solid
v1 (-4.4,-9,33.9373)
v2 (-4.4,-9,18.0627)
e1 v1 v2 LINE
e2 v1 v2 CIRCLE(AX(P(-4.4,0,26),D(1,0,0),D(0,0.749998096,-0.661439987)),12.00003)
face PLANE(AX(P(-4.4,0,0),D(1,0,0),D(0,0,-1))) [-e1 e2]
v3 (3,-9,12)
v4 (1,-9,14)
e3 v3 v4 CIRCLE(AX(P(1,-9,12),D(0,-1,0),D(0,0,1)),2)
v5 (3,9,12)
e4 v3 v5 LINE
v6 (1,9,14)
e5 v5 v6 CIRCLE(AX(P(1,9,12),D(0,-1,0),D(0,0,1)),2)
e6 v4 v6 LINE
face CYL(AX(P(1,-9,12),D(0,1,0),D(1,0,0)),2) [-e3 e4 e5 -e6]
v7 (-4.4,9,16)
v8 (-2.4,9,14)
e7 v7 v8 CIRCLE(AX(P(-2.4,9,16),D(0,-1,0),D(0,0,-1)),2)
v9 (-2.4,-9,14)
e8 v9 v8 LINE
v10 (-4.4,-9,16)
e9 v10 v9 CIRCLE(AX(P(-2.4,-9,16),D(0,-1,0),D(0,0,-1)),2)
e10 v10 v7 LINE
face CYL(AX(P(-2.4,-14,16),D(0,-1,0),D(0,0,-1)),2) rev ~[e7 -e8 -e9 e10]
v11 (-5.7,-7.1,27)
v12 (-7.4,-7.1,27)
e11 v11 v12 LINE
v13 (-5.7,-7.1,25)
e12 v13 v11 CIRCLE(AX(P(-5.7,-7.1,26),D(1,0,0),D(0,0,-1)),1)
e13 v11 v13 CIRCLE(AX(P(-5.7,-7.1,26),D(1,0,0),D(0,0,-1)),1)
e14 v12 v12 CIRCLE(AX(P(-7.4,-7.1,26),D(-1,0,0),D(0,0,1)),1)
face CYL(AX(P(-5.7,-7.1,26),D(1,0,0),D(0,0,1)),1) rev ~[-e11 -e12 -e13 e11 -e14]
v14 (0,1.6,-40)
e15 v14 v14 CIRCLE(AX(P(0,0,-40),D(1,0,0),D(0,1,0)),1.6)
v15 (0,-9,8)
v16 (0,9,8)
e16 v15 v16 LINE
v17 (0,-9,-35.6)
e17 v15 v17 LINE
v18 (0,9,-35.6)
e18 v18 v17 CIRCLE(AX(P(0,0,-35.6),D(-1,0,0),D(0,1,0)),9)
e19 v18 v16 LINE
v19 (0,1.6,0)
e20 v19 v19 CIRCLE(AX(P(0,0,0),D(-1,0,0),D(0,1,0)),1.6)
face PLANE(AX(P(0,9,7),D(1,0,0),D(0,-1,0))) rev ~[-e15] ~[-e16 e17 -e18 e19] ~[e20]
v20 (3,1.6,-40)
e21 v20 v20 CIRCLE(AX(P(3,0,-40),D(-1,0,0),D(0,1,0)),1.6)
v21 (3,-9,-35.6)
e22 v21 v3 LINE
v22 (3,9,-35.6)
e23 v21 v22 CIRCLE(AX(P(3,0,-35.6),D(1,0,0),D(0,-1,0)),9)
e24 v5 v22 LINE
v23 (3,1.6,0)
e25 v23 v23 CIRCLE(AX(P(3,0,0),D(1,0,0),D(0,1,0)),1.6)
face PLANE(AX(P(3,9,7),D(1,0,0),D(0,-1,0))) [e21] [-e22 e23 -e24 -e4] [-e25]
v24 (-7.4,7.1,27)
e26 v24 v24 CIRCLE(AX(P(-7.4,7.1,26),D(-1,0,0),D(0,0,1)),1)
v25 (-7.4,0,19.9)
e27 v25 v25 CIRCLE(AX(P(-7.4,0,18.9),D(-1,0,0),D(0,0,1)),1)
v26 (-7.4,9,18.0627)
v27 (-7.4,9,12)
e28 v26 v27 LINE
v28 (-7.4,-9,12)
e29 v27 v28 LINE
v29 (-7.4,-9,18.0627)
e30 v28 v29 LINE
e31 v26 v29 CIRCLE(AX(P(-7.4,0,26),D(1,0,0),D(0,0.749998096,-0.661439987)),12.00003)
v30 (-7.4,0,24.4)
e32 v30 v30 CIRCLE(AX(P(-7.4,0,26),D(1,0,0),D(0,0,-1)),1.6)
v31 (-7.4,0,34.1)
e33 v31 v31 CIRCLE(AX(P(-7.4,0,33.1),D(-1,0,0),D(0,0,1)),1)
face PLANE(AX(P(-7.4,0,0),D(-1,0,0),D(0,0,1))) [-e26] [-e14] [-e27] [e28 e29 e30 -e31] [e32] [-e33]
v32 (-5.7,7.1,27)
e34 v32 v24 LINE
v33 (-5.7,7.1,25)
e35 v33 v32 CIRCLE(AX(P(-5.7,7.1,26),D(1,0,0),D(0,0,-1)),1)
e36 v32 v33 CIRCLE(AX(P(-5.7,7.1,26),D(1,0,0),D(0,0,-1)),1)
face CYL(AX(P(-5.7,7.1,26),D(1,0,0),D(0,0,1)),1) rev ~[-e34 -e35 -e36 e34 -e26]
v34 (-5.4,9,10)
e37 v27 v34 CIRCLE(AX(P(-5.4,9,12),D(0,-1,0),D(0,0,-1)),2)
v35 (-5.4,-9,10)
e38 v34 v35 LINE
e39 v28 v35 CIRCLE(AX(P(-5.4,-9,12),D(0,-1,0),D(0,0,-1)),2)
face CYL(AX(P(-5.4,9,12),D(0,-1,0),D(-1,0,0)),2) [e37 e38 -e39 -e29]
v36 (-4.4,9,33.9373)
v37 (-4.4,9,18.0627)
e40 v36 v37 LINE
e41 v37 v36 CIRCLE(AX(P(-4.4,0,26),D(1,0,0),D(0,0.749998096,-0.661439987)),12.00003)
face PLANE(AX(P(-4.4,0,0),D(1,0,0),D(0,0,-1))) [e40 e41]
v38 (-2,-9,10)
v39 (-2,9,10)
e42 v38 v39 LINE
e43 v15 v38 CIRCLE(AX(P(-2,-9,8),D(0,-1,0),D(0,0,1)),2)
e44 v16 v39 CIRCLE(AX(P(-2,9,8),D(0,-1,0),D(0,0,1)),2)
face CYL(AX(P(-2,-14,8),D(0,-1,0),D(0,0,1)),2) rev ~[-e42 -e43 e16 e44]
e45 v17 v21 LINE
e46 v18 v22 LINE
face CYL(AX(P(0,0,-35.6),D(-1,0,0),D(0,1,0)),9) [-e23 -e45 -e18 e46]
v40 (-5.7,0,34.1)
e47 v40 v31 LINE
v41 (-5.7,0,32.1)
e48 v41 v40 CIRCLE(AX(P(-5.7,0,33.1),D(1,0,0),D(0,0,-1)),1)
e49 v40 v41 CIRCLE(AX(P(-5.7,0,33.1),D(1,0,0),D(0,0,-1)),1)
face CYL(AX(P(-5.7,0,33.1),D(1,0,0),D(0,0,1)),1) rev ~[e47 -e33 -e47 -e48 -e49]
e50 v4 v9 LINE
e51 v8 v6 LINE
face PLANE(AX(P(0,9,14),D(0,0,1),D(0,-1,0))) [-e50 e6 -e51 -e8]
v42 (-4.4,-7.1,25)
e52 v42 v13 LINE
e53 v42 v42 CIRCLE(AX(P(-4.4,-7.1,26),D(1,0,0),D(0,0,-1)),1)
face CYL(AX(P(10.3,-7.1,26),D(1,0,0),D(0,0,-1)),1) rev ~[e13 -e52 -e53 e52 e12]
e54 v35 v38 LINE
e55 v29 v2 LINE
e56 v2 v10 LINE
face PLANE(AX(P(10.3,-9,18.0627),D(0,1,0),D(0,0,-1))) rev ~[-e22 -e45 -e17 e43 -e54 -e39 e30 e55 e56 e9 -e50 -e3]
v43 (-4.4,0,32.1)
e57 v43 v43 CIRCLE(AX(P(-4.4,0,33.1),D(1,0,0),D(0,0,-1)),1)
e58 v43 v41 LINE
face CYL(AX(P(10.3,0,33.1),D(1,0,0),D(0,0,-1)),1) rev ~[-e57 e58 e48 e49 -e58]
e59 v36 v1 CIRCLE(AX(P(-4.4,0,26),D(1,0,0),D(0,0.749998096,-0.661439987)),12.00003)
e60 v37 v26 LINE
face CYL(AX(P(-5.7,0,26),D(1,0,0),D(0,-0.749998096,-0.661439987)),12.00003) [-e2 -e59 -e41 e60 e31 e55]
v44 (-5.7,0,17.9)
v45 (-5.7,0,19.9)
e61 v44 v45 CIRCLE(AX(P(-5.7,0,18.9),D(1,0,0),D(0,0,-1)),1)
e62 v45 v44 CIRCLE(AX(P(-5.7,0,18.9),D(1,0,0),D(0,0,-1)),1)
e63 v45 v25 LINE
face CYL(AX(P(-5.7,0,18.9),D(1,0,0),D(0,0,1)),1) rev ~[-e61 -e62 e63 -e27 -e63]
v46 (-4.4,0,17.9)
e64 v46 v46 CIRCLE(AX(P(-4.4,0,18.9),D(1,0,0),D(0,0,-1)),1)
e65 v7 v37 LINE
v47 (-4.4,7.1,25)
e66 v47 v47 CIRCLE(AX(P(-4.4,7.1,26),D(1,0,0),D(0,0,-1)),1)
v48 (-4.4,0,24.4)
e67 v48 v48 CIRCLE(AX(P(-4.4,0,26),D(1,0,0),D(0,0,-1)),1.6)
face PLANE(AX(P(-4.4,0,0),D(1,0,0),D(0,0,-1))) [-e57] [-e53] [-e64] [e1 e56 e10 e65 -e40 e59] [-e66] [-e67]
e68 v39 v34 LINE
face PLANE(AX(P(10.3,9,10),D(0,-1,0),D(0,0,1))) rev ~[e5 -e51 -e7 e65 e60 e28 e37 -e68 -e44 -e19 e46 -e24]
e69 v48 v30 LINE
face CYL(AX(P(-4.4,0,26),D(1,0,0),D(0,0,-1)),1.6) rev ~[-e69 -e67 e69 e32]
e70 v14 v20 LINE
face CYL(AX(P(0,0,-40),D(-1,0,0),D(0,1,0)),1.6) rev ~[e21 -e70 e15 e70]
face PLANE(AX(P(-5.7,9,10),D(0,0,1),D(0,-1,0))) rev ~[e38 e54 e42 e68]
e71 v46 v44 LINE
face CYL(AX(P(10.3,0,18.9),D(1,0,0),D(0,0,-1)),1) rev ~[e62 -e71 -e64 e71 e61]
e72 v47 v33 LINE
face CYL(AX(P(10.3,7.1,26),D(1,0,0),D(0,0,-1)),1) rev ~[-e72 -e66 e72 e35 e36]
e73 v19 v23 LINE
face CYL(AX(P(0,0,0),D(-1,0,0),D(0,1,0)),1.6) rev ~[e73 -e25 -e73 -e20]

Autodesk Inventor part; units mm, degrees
ref_plane "YZ Plane" through (0, 0, 0) normal (1, 0, 0) x (0, 1, 0)
ref_plane "XZ Plane" through (0, 0, 0) normal (0, 1, 0) x (-1, 0, 0)
ref_plane "XY Plane" through (0, 0, 0) normal (0, 0, 1) x (1, 0, 0)
sketch "Sketch1" plane through (0, 0, 0) normal (1, 0, 0) x (0, 1, 0)
  circle A0 centre (0, 0) radius 1.6
  line L0 (0, 0) -> (0, -40)
  circle A1 centre (0, -40) radius 1.6
  line L1 (0, -40) -> (0, -44.6)
  line L2 (0, -44.6) -> (0, -35.6)
  line L3 (0, 0) -> (0, 4.6)
  line L4 (0, 4.6) -> (0, -4.4)
  circle A2 centre (0, -35.6) radius 9
  line L5 (9, -4.4) -> (9, -35.6)
  line L6 (-9, -35.6) -> (-9, -4.4)
  line L7 (0, 0) -> (0, 7)
  line L8 (0, 7) -> (9, 7)
  line L9 (9, 7) -> (9, -4.4)
  line L10 (0, 7) -> (-9, 7)
  line L11 (-9, 7) -> (-9, -4.4)
  dimension "d0" = 3.2
  dimension "d1" = 40
  dimension "d2" = 3.2
  dimension "d3" = 4.6
  dimension "d4" = 9
  dimension "d5" = 4.6
  dimension "d6" = 9
  dimension "d9" = 7
extrude "Extrusion2" add sketch "Sketch1" along normal blind 3 contours A0 L3 L7 L8 L9 L5 A2 L0 | A0 L0 A2 L6 L11 L10 L7 L3 | A2 L1 A1 L0 | L0 A1 L1 A2
sketch "Sketch2" plane through (0, -9, 7) normal (0, 0, 1) x (1, 0, 0)
  line L0 (0, 18) -> (0, 0) projected
  line L1 (0, 0) -> (3, 0) projected
  line L2 (3, 18) -> (3, 0) projected
  line L3 (0, 18) -> (3, 18) projected
  point P0 (0, 9)
extrude "Extrusion3" add sketch "Sketch2" along normal blind 24.5
sketch "Sketch5" plane through (3, 0, 0) normal (1, 0, 0) x (0, 0, -1)
  line L0 (35.6, 9) -> (-31.5, 9) projected
  line L1 (-31.5, -9) -> (-31.5, 9) projected
  line L2 (35.6, -9) -> (-31.5, -9) projected
  arc A0 (35.6, -9) -> (35.6, 9) centre (35.6, 0) ccw projected
  circle A1 centre (40, 0) radius 1.6 projected
  circle A2 centre (0, 0) radius 1.6 projected
  line L3 (0, 0) -> (-10, 0)
  line L4 (-10, 0) -> (-10, 9)
  line L5 (35.6, 9) -> (-31.5, 9) projected
  line L6 (-10, 0) -> (-10, -9)
  line L7 (35.6, -9) -> (-31.5, -9) projected
  line L8 (-10, -9) -> (-14, -9)
  line L9 (-14, -9) -> (-14, 9)
  line L10 (-10, 9) -> (-14, 9)
  dimension "d18" = 10
  dimension "d19" = 4
extrude "Extrusion5" add sketch "Sketch5" along normal blind 4.3 contours L4 L6 L2 L9 L0
sketch "Sketch6" plane through (7.3, 0, 0) normal (1, 0, 0) x (0, 0, -1)
  line L0 (-14, -9) -> (-10, -9) projected
  line L1 (-10, -9) -> (-10, 9) projected
  line L2 (-10, 9) -> (-14, 9) projected
  line L3 (-14, 9) -> (-14, -9) projected
  line L4 (-14, -9) -> (-14, 9) projected
  line L5 (-14, 9) -> (-14, 0)
  line L6 (-14, 0) -> (-26, 0)
  circle A0 centre (-26, 0) radius 12
  line L7 (-14, 9) -> (-18.0627, 9)
  line L8 (-14, 9) -> (-31.5, 9) projected
  line L9 (-14, -9) -> (-18.0627, -9)
  line L10 (-14, -9) -> (-31.5, -9) projected
  point P0 (0, 0)
  dimension "d22" = 12
extrude "Extrusion6" add sketch "Sketch6" along normal blind 3
sketch "Sketch7" plane through (0, 0, 0) normal (-1, 0, 0) x (0, 0, 1)
  line L0 (10, -9) -> (10, 9) projected
  line L1 (14, 9) -> (14, -9) projected
  line L2 (-35.6, 9) -> (31.5, 9) projected
  line L3 (-35.6, 9) -> (31.5, 9) projected
  arc A0 (-35.6, 9) -> (-35.6, -9) centre (-35.6, 0) ccw projected
  line L4 (-35.6, -9) -> (31.5, -9) projected
  line L5 (31.5, 9) -> (31.5, -9) projected
  circle A1 centre (-40, 0) radius 1.6 projected
  circle A2 centre (0, 0) radius 1.6 projected
extrude "Extrusion7" add sketch "Sketch7" along normal blind 2.7 contours L0 L2 L1 L4
sketch "Sketch8" plane through (-2.7, 0, 0) normal (-1, 0, 0) x (0, 0, 1)
  line L0 (14, -9) -> (14, 9) projected
  line L1 (14, 9) -> (10, 9) projected
  line L2 (10, 9) -> (10, -9) projected
  line L3 (10, -9) -> (14, -9) projected
  line L4 (14, 9) -> (14, -9) projected
  line L5 (18.0627, -9) -> (14, -9) projected
  arc A0 (18.0627, -9) -> (18.0627, 9) centre (26, 0) ccw projected
  line L6 (14, 9) -> (18.0627, 9) projected
  point P0 (0, 0)
extrude "Extrusion8" add sketch "Sketch8" along normal blind 3
sketch "Sketch9" plane through (0, -9, 31.5) normal (0, 0, 1) x (1, 0, 0)
  line L0 (0, 18) -> (0, 0) projected
  line L1 (0, 0) -> (3, 0) projected
  line L2 (3, 0) -> (3, 18) projected
  line L3 (3, 18) -> (0, 18) projected
  point P0 (0, 9)
extrude "Extrusion9" cut sketch "Sketch9" against normal blind 17.5
sketch "Sketch10" plane through (10.3, 0, 0) normal (1, 0, 0) x (0, 0, -1)
  line L0 (-18.0627, -9) -> (-10, -9) projected
  line L1 (-10, -9) -> (-10, 9) projected
  line L2 (-10, 9) -> (-18.0627, 9) projected
  arc A0 (-18.0627, 9) -> (-18.0627, -9) centre (-26, 0) ccw projected
  circle A1 centre (-26, 0) radius 12
  line L3 (-26, 0) -> (-18.9, 0)
  line L4 (-26, 0) -> (-26, -7.1)
  circle A2 centre (-18.9, 0) radius 1
  circle A3 centre (-26, -7.1) radius 1
  circle A4 centre (-33.1, 0) radius 1
  circle A5 centre (-26, 7.1) radius 1
  point P0 (0, 0)
  dimension "d31" = 7.1
  dimension "d32" = 7.1
  dimension "d33" = 2
  dimension "d34" = 2
extrude "Extrusion10" cut sketch "Sketch10" against normal blind 17.5 contours A2 | A3 | A4 | A5
sketch "Sketch11" plane through (-5.7, 0, 0) normal (-1, 0, 0) x (0, 0, 1)
  circle A0 centre (26, -7.1) radius 1 projected
  circle A1 centre (26, 7.1) radius 1 projected
  circle A2 centre (33.1, 0) radius 1 projected
  circle A3 centre (18.9, 0) radius 1 projected
  line L0 (18.0627, 9) -> (10, 9) projected
  line L1 (10, 9) -> (10, -9) projected
  line L2 (10, -9) -> (18.0627, -9) projected
  arc A4 (18.0627, -9) -> (18.0627, 9) centre (26, 0) ccw projected
  point P0 (0, 0)
extrude "Extrusion11" add sketch "Sketch11" along normal blind 1.7
sketch "Sketch12" plane through (-2.7, 0, 0) normal (1, 0, 0) x (0, 0, -1)
  circle A0 centre (-26, -7.1) radius 1 projected
  circle A1 centre (-26, 7.1) radius 1 projected
  circle A2 centre (-33.1, 0) radius 1 projected
  circle A3 centre (-18.9, 0) radius 1 projected
  line L0 (-18.0627, -9) -> (-10, -9) projected
  line L1 (-10, -9) -> (-10, 9) projected
  line L2 (-10, 9) -> (-18.0627, 9) projected
  arc A4 (-18.0627, 9) -> (-18.0627, -9) centre (-26, 0) ccw projected
  circle A5 centre (-26, -7.1) radius 1 projected
  circle A6 centre (-26, 7.1) radius 1 projected
  circle A7 centre (-33.1, 0) radius 1 projected
  circle A8 centre (-18.9, 0) radius 1 projected
  line L3 (-14, -9) -> (-14, 9) projected
  line L4 (-18.0627, 9) -> (-14, 9) projected
  arc A9 (-18.0627, 9) -> (-18.0627, -9) centre (-26, 0) ccw projected
  line L5 (-14, -9) -> (-18.0627, -9) projected
  point P0 (0, 0)
extrude "Extrusion12" cut sketch "Sketch12" against normal blind 1.7 contours A4 L2 L3 L0
sketch "Sketch13" plane through (10.3, 0, 0) normal (1, 0, 0) x (0, 0, -1)
  circle A0 centre (-26, -7.1) radius 1 projected
  circle A1 centre (-26, 7.1) radius 1 projected
  circle A2 centre (-33.1, 0) radius 1 projected
  circle A3 centre (-18.9, 0) radius 1 projected
  line L0 (-18.0627, -9) -> (-10, -9) projected
  line L1 (-10, -9) -> (-10, 9) projected
  line L2 (-10, 9) -> (-18.0627, 9) projected
  arc A4 (-18.0627, 9) -> (-18.0627, -9) centre (-26, 0) ccw projected
  point P0 (0, 0)
extrude "Extrusion13" add sketch "Sketch13" along normal blind 1.7
sketch "Sketch14" plane through (7.3, 0, 0) normal (-1, 0, 0) x (0, 0, 1)
  line L0 (10, -9) -> (10, 9) projected
  line L1 (10, 9) -> (18.0627, 9) projected
  arc A0 (18.0627, -9) -> (18.0627, 9) centre (26, 0) ccw projected
  line L2 (18.0627, -9) -> (10, -9) projected
  circle A1 centre (18.9, 0) radius 1 projected
  circle A2 centre (33.1, 0) radius 1 projected
  circle A3 centre (26, 7.1) radius 1 projected
  circle A4 centre (26, -7.1) radius 1 projected
  circle A5 centre (26, -7.1) radius 1 projected
  circle A6 centre (26, 7.1) radius 1 projected
  circle A7 centre (33.1, 0) radius 1 projected
  circle A8 centre (18.9, 0) radius 1 projected
  line L3 (14, 9) -> (14, -9) projected
  line L4 (18.0627, -9) -> (14, -9) projected
  arc A9 (18.0627, -9) -> (18.0627, 9) centre (26, 0) ccw projected
  line L5 (14, 9) -> (18.0627, 9) projected
  point P0 (0, 0)
extrude "Extrusion14" cut sketch "Sketch14" against normal blind 1.7 contours L3 L1 A0 L2
sketch "Sketch15" plane through (12, 0, 0) normal (1, 0, 0) x (0, 0, -1)
  line L0 (-10, -9) -> (-10, 9) projected
  line L1 (-10, 9) -> (-18.0627, 9) projected
  arc A0 (-18.0627, 9) -> (-18.0627, -9) centre (-26, 0) ccw projected
  line L2 (-18.0627, -9) -> (-10, -9) projected
  circle A1 centre (-18.9, 0) radius 1 projected
  circle A2 centre (-33.1, 0) radius 1 projected
  circle A3 centre (-26, 7.1) radius 1 projected
  circle A4 centre (-26, -7.1) radius 1 projected
  point P0 (0, 0)
extrude "Extrusion15" cut sketch "Sketch15" against normal blind 9
sketch "Sketch16" plane through (-4.4, 0, 0) normal (1, 0, 0) x (0, 0, -1)
  line L0 (-18.0627, 9) -> (-14, 9) projected
  arc A0 (-18.0627, 9) -> (-18.0627, -9) centre (-26, 0) ccw projected
  line L1 (-14, -9) -> (-18.0627, -9) projected
  line L2 (-14, 9) -> (-14, -9) projected
  circle A1 centre (-18.9, 0) radius 1 projected
  circle A2 centre (-33.1, 0) radius 1 projected
  circle A3 centre (-26, 7.1) radius 1 projected
  circle A4 centre (-26, -7.1) radius 1 projected
  circle A5 centre (-26, 0) radius 1.6
  point P0 (0, 0)
  dimension "d47" = 3.2
extrude "Extrusion16" cut sketch "Sketch16" against normal blind 10 contours A5
fillet "Fillet1" radius 2 2 edges at (-4.4, 0, 14) (0, 0, 10)
fillet "Fillet2" radius 2 2 edges at (3, 0, 14) (-7.4, 0, 10)
properties part number "union_servos"
